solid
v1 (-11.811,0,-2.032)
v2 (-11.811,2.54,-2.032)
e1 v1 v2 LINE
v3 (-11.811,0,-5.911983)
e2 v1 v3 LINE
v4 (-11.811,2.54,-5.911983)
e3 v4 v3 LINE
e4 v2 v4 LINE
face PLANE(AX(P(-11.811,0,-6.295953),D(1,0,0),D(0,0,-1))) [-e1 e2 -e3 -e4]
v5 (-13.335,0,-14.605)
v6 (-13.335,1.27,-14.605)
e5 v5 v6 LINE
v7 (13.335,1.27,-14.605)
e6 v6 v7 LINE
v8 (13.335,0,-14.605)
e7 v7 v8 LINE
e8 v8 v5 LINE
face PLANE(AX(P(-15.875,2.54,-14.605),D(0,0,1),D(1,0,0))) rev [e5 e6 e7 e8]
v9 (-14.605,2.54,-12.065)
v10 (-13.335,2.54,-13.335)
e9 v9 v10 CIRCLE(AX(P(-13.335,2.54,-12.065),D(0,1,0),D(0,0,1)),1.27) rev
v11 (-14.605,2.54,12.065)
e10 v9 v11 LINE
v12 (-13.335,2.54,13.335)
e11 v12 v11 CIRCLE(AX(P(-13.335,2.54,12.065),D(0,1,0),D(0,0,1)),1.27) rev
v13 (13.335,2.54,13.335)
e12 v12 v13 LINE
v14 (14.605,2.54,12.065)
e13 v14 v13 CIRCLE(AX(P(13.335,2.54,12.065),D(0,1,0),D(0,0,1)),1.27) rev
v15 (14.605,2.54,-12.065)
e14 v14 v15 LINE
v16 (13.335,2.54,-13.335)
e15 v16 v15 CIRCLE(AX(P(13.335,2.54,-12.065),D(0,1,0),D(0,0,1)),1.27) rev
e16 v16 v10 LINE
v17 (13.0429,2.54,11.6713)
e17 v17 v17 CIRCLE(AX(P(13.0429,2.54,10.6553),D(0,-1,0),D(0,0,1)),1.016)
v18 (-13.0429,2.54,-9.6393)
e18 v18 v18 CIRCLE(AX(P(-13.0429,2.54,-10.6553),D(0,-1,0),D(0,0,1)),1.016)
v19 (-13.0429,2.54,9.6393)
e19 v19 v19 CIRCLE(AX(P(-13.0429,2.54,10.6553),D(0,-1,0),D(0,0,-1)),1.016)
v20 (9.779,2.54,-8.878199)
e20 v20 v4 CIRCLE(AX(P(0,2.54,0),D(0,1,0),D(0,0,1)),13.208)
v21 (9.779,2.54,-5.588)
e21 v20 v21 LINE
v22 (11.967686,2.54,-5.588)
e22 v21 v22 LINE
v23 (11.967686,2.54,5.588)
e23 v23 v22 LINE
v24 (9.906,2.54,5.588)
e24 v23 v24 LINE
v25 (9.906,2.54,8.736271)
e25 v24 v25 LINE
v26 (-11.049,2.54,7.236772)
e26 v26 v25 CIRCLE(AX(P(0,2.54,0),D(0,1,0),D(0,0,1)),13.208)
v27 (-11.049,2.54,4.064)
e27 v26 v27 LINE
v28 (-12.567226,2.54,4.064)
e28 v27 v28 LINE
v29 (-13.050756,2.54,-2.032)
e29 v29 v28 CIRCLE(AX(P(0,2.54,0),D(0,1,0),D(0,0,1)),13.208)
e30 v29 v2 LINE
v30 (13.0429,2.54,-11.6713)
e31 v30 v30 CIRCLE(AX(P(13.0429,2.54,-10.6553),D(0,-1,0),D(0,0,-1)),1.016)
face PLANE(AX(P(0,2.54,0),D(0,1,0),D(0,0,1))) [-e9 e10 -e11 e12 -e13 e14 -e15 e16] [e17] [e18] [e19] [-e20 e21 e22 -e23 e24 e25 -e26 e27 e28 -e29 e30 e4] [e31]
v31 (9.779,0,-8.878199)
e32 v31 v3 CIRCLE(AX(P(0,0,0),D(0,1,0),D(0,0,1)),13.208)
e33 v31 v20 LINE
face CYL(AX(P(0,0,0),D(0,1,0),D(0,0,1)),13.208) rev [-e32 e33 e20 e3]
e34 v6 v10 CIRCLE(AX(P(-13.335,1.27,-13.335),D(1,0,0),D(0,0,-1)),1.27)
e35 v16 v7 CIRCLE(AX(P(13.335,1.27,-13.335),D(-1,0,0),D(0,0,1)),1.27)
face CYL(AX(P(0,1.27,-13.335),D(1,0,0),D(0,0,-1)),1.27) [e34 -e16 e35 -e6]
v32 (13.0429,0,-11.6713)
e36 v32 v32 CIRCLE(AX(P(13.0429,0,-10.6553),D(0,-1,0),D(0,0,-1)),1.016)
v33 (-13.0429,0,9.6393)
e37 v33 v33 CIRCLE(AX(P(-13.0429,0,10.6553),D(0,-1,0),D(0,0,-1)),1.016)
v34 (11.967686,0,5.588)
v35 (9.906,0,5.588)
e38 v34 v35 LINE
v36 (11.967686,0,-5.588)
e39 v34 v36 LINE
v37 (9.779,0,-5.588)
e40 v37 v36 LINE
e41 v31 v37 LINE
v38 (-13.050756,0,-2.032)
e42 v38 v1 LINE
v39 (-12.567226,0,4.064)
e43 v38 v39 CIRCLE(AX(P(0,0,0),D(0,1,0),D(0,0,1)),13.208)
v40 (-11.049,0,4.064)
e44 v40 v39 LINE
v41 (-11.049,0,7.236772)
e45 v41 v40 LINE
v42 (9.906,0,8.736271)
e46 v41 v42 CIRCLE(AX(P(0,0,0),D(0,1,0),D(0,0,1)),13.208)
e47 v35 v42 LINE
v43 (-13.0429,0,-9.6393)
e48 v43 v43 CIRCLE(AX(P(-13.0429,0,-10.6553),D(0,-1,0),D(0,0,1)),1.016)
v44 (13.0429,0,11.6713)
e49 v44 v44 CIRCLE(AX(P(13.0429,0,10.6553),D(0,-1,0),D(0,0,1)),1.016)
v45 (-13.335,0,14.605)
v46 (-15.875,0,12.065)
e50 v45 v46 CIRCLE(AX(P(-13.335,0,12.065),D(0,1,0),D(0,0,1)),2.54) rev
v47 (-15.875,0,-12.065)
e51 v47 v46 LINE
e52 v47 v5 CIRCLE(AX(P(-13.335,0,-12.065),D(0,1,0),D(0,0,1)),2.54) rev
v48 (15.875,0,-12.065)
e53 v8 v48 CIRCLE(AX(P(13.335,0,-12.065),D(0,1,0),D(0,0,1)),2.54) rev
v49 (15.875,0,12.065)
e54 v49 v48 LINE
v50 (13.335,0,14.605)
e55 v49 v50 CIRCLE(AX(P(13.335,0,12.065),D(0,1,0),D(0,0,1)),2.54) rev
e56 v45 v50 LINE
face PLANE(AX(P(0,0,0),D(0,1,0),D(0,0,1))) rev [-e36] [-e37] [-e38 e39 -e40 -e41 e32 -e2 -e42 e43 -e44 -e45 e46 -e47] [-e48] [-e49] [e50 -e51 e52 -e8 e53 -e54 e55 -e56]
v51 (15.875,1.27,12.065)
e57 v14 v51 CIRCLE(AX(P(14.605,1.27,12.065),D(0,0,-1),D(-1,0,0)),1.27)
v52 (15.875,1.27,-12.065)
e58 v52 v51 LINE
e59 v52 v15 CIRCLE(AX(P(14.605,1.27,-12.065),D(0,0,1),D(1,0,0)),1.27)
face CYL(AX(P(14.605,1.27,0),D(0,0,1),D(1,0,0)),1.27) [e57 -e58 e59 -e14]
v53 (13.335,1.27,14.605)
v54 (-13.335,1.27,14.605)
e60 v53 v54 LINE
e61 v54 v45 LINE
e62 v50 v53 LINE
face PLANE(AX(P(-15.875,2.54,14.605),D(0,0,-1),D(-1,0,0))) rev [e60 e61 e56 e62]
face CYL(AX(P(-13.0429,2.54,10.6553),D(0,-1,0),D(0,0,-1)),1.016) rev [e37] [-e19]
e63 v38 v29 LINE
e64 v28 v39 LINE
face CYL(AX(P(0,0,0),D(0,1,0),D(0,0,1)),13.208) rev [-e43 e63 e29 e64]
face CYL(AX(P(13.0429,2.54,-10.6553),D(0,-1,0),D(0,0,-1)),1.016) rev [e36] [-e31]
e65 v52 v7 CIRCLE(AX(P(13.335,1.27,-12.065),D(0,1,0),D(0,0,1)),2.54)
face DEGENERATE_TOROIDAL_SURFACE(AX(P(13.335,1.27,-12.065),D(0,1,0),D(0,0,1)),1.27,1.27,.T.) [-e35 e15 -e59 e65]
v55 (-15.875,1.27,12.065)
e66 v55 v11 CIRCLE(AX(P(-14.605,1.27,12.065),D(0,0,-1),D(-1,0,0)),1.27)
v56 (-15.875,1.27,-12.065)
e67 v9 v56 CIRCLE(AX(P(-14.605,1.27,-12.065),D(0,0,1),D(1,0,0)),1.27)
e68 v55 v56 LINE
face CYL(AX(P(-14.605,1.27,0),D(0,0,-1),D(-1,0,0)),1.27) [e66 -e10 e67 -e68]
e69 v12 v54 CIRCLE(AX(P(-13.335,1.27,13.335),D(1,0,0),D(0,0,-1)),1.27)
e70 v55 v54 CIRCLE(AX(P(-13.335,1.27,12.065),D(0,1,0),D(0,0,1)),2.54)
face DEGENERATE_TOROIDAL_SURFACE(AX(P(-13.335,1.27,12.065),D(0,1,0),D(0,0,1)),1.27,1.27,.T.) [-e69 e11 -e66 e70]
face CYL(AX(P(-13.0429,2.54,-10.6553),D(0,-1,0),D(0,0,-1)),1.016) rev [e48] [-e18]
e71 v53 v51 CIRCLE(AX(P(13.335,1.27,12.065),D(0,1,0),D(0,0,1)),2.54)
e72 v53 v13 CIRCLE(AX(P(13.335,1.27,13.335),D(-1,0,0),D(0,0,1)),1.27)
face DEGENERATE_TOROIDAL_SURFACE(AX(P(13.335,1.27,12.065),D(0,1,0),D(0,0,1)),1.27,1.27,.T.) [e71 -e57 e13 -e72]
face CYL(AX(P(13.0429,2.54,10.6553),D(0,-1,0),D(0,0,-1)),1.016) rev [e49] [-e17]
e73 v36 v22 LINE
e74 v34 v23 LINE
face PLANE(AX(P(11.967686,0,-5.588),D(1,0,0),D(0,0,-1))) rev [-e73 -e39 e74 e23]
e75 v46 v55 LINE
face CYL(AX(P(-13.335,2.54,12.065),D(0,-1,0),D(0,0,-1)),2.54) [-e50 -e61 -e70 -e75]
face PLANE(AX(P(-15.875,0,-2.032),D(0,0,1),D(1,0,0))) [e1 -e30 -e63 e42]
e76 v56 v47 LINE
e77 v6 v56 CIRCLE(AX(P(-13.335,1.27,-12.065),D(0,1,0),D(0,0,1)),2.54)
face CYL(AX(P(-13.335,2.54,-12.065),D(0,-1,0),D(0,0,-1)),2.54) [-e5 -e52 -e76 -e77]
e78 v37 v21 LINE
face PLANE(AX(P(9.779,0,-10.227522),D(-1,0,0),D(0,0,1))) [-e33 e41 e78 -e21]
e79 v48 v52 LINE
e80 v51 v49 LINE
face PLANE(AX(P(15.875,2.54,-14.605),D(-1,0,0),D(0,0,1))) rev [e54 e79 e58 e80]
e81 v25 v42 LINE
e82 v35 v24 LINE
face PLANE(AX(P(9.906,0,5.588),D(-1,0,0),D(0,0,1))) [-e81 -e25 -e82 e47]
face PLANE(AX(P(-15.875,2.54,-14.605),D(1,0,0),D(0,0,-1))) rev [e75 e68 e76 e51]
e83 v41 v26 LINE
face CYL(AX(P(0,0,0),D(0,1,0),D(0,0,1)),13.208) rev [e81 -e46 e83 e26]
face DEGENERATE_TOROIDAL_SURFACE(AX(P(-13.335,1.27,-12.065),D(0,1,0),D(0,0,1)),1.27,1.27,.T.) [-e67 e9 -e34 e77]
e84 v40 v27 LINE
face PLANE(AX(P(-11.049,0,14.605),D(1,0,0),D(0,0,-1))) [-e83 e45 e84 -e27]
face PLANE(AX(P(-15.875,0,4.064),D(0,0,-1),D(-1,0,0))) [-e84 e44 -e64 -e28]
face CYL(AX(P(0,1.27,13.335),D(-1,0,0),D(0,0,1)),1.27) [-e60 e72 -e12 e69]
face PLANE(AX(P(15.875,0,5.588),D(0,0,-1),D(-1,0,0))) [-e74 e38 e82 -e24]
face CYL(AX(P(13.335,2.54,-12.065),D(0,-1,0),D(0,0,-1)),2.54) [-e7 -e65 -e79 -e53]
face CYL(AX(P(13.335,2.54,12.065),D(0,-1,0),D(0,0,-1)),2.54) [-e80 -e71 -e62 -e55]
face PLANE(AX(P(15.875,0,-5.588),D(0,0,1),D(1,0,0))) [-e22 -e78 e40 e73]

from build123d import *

# Parameters (mm, degrees)
SKETCH1_W           = 31.75
SKETCH1_H           = 29.21
BOSS_EXTRUDE1_DEPTH = 2.54
CUT_EXTRUDE1_DEPTH  = 22.720341848
SKETCH3_W           = 4.064
SKETCH3_H           = 4.263952617
SKETCH3_W_2         = 4.826
SKETCH3_H_2         = 10.541
SKETCH3_W_3         = 5.969
SKETCH3_H_3         = 4.464530762
SKETCH3_W_4         = 6.096
SKETCH3_H_4         = 4.639521707
BOSS_EXTRUDE2_DEPTH = 2.54
FILLET1_R           = 1.27
SKETCH5_R           = 1.016
CUT_EXTRUDE3_DEPTH  = 22.720341848
FILLET2_R           = 2.54


with BuildPart() as part:
    # Sketch1 → Boss-Extrude1 (new body)
    with BuildSketch(Plane(origin=(0, 0, 0), x_dir=(1, 0, 0), z_dir=(0, 1, 0))):
        Rectangle(SKETCH1_W, SKETCH1_H)
    extrude(amount=BOSS_EXTRUDE1_DEPTH)

    # Sketch2 → Cut-Extrude1 (cut, through all)
    with BuildSketch(Plane(origin=(0, 2.54, 0), x_dir=(1, 0, 0), z_dir=(0, 1, 0))):
        with BuildLine():
            Line((11.967686493, 5.588), (11.967686493, -5.588))
            ThreePointArc((11.967686493, -5.588), (-13.208, 0), (11.967686493, 5.588))
        make_face()
    extrude(amount=-CUT_EXTRUDE1_DEPTH, mode=Mode.SUBTRACT)

    # Sketch3 → Boss-Extrude2 (add)
    with BuildSketch(Plane(origin=(0, 2.54, 0), x_dir=(1, 0, 0), z_dir=(0, 1, 0))):
        with Locations((-13.843, 4.163976309)):
            Rectangle(SKETCH3_W, SKETCH3_H)
        with Locations((-13.462, -9.3345)):
            Rectangle(SKETCH3_W_2, SKETCH3_H_2)
        with Locations((12.8905, -7.820265381)):
            Rectangle(SKETCH3_W_3, SKETCH3_H_3)
        with Locations((12.827, 7.907760854)):
            Rectangle(SKETCH3_W_4, SKETCH3_H_4)
    extrude(amount=-BOSS_EXTRUDE2_DEPTH)

    # Fillet1
    fillet1_edges = [part.edges().sort_by_distance(p)[0] for p in [
        (15.875, 2.54, 0),
        (0, 2.54, -14.605),
        (-15.875, 2.54, 0),
        (0, 2.54, 14.605),
    ]]
    fillet(fillet1_edges, radius=FILLET1_R)

    # Sketch5 → Cut-Extrude3 (cut, through all)
    with BuildSketch(Plane.XZ):
        with Locations(Location((13.0429, -10.6553, 0), (0, 0, 270))):
            Circle(SKETCH5_R)
        with Locations(Location((-13.0429, -10.6553, 0), (0, 0, 90))):
            Circle(SKETCH5_R)
        with Locations(Location((-13.0429, 10.6553, 0), (0, 0, 270))):
            Circle(SKETCH5_R)
        with Locations(Location((13.0429, 10.6553, 0), (0, 0, 90))):
            Circle(SKETCH5_R)
    extrude(amount=-CUT_EXTRUDE3_DEPTH, mode=Mode.SUBTRACT)

    # Fillet2
    # the kernel refuses this fillet: 2.54 mm, written as the material it takes off along each edge
    with BuildSketch(Plane(origin=(13.335, 2.54, -12.065), x_dir=(1, 0, 0), z_dir=(0, 0, 1))) as fillet2_piece_1:
        with BuildLine():
            CenterArc((1.27, -1.27), 1.27, 0, 90)
            Line((2.54, -1.27), (2.54, 0))
            Line((2.54, 0), (1.27, 0))
        make_face()
    revolve(axis=Axis((13.335, 2.54, -12.065), (0, 1, 0)), revolution_arc=90, mode=Mode.SUBTRACT)
    with BuildSketch(Plane(origin=(13.335, 2.54, 12.065), x_dir=(0, 0, 1), z_dir=(-1, 0, 0))) as fillet2_piece_2:
        with BuildLine():
            CenterArc((1.27, -1.27), 1.27, 0, 90)
            Line((2.54, -1.27), (2.54, 0))
            Line((2.54, 0), (1.27, 0))
        make_face()
    revolve(axis=Axis((13.335, 2.54, 12.065), (0, 1, 0)), revolution_arc=90, mode=Mode.SUBTRACT)
    with BuildSketch(Plane(origin=(-13.335, 2.54, -12.065), x_dir=(0, 0, -1), z_dir=(1, 0, 0))) as fillet2_piece_3:
        with BuildLine():
            CenterArc((1.27, -1.27), 1.27, 0, 90)
            Line((2.54, -1.27), (2.54, 0))
            Line((2.54, 0), (1.27, 0))
        make_face()
    revolve(axis=Axis((-13.335, 2.54, -12.065), (0, 1, 0)), revolution_arc=90, mode=Mode.SUBTRACT)
    with BuildSketch(Plane(origin=(-13.335, 2.54, 12.065), x_dir=(-1, 0, 0), z_dir=(0, 0, -1))) as fillet2_piece_4:
        with BuildLine():
            CenterArc((1.27, -1.27), 1.27, 0, 90)
            Line((2.54, -1.27), (2.54, 0))
            Line((2.54, 0), (1.27, 0))
        make_face()
    revolve(axis=Axis((-13.335, 2.54, 12.065), (0, 1, 0)), revolution_arc=90, mode=Mode.SUBTRACT)
    with BuildSketch(Plane(origin=(-15.875, -6.35, 14.605), x_dir=(0, 0, -1), z_dir=(0, 1, 0)), Plane(origin=(-15.875, -6.35, -14.605), x_dir=(1, 0, 0), z_dir=(0, 1, 0))) as fillet2_piece_5:
        with BuildLine():
            CenterArc((FILLET2_R, -FILLET2_R), FILLET2_R, 90, 90)
            Line((0, -FILLET2_R), (0, 0))
            Line((0, 0), (FILLET2_R, 0))
        make_face()
    extrude(amount=8.89, mode=Mode.SUBTRACT)
    with BuildSketch(Plane(origin=(15.875, -6.35, -14.605), x_dir=(-1, 0, 0), z_dir=(0, 1, 0)), Plane(origin=(15.875, -6.35, 14.605), x_dir=(0, 0, -1), z_dir=(0, 1, 0))) as fillet2_piece_6:
        with BuildLine():
            CenterArc((FILLET2_R, FILLET2_R), FILLET2_R, 180, 90)
            Line((0, FILLET2_R), (0, 0))
            Line((0, 0), (FILLET2_R, 0))
        make_face()
    extrude(amount=8.89, mode=Mode.SUBTRACT)


solid = part.part
